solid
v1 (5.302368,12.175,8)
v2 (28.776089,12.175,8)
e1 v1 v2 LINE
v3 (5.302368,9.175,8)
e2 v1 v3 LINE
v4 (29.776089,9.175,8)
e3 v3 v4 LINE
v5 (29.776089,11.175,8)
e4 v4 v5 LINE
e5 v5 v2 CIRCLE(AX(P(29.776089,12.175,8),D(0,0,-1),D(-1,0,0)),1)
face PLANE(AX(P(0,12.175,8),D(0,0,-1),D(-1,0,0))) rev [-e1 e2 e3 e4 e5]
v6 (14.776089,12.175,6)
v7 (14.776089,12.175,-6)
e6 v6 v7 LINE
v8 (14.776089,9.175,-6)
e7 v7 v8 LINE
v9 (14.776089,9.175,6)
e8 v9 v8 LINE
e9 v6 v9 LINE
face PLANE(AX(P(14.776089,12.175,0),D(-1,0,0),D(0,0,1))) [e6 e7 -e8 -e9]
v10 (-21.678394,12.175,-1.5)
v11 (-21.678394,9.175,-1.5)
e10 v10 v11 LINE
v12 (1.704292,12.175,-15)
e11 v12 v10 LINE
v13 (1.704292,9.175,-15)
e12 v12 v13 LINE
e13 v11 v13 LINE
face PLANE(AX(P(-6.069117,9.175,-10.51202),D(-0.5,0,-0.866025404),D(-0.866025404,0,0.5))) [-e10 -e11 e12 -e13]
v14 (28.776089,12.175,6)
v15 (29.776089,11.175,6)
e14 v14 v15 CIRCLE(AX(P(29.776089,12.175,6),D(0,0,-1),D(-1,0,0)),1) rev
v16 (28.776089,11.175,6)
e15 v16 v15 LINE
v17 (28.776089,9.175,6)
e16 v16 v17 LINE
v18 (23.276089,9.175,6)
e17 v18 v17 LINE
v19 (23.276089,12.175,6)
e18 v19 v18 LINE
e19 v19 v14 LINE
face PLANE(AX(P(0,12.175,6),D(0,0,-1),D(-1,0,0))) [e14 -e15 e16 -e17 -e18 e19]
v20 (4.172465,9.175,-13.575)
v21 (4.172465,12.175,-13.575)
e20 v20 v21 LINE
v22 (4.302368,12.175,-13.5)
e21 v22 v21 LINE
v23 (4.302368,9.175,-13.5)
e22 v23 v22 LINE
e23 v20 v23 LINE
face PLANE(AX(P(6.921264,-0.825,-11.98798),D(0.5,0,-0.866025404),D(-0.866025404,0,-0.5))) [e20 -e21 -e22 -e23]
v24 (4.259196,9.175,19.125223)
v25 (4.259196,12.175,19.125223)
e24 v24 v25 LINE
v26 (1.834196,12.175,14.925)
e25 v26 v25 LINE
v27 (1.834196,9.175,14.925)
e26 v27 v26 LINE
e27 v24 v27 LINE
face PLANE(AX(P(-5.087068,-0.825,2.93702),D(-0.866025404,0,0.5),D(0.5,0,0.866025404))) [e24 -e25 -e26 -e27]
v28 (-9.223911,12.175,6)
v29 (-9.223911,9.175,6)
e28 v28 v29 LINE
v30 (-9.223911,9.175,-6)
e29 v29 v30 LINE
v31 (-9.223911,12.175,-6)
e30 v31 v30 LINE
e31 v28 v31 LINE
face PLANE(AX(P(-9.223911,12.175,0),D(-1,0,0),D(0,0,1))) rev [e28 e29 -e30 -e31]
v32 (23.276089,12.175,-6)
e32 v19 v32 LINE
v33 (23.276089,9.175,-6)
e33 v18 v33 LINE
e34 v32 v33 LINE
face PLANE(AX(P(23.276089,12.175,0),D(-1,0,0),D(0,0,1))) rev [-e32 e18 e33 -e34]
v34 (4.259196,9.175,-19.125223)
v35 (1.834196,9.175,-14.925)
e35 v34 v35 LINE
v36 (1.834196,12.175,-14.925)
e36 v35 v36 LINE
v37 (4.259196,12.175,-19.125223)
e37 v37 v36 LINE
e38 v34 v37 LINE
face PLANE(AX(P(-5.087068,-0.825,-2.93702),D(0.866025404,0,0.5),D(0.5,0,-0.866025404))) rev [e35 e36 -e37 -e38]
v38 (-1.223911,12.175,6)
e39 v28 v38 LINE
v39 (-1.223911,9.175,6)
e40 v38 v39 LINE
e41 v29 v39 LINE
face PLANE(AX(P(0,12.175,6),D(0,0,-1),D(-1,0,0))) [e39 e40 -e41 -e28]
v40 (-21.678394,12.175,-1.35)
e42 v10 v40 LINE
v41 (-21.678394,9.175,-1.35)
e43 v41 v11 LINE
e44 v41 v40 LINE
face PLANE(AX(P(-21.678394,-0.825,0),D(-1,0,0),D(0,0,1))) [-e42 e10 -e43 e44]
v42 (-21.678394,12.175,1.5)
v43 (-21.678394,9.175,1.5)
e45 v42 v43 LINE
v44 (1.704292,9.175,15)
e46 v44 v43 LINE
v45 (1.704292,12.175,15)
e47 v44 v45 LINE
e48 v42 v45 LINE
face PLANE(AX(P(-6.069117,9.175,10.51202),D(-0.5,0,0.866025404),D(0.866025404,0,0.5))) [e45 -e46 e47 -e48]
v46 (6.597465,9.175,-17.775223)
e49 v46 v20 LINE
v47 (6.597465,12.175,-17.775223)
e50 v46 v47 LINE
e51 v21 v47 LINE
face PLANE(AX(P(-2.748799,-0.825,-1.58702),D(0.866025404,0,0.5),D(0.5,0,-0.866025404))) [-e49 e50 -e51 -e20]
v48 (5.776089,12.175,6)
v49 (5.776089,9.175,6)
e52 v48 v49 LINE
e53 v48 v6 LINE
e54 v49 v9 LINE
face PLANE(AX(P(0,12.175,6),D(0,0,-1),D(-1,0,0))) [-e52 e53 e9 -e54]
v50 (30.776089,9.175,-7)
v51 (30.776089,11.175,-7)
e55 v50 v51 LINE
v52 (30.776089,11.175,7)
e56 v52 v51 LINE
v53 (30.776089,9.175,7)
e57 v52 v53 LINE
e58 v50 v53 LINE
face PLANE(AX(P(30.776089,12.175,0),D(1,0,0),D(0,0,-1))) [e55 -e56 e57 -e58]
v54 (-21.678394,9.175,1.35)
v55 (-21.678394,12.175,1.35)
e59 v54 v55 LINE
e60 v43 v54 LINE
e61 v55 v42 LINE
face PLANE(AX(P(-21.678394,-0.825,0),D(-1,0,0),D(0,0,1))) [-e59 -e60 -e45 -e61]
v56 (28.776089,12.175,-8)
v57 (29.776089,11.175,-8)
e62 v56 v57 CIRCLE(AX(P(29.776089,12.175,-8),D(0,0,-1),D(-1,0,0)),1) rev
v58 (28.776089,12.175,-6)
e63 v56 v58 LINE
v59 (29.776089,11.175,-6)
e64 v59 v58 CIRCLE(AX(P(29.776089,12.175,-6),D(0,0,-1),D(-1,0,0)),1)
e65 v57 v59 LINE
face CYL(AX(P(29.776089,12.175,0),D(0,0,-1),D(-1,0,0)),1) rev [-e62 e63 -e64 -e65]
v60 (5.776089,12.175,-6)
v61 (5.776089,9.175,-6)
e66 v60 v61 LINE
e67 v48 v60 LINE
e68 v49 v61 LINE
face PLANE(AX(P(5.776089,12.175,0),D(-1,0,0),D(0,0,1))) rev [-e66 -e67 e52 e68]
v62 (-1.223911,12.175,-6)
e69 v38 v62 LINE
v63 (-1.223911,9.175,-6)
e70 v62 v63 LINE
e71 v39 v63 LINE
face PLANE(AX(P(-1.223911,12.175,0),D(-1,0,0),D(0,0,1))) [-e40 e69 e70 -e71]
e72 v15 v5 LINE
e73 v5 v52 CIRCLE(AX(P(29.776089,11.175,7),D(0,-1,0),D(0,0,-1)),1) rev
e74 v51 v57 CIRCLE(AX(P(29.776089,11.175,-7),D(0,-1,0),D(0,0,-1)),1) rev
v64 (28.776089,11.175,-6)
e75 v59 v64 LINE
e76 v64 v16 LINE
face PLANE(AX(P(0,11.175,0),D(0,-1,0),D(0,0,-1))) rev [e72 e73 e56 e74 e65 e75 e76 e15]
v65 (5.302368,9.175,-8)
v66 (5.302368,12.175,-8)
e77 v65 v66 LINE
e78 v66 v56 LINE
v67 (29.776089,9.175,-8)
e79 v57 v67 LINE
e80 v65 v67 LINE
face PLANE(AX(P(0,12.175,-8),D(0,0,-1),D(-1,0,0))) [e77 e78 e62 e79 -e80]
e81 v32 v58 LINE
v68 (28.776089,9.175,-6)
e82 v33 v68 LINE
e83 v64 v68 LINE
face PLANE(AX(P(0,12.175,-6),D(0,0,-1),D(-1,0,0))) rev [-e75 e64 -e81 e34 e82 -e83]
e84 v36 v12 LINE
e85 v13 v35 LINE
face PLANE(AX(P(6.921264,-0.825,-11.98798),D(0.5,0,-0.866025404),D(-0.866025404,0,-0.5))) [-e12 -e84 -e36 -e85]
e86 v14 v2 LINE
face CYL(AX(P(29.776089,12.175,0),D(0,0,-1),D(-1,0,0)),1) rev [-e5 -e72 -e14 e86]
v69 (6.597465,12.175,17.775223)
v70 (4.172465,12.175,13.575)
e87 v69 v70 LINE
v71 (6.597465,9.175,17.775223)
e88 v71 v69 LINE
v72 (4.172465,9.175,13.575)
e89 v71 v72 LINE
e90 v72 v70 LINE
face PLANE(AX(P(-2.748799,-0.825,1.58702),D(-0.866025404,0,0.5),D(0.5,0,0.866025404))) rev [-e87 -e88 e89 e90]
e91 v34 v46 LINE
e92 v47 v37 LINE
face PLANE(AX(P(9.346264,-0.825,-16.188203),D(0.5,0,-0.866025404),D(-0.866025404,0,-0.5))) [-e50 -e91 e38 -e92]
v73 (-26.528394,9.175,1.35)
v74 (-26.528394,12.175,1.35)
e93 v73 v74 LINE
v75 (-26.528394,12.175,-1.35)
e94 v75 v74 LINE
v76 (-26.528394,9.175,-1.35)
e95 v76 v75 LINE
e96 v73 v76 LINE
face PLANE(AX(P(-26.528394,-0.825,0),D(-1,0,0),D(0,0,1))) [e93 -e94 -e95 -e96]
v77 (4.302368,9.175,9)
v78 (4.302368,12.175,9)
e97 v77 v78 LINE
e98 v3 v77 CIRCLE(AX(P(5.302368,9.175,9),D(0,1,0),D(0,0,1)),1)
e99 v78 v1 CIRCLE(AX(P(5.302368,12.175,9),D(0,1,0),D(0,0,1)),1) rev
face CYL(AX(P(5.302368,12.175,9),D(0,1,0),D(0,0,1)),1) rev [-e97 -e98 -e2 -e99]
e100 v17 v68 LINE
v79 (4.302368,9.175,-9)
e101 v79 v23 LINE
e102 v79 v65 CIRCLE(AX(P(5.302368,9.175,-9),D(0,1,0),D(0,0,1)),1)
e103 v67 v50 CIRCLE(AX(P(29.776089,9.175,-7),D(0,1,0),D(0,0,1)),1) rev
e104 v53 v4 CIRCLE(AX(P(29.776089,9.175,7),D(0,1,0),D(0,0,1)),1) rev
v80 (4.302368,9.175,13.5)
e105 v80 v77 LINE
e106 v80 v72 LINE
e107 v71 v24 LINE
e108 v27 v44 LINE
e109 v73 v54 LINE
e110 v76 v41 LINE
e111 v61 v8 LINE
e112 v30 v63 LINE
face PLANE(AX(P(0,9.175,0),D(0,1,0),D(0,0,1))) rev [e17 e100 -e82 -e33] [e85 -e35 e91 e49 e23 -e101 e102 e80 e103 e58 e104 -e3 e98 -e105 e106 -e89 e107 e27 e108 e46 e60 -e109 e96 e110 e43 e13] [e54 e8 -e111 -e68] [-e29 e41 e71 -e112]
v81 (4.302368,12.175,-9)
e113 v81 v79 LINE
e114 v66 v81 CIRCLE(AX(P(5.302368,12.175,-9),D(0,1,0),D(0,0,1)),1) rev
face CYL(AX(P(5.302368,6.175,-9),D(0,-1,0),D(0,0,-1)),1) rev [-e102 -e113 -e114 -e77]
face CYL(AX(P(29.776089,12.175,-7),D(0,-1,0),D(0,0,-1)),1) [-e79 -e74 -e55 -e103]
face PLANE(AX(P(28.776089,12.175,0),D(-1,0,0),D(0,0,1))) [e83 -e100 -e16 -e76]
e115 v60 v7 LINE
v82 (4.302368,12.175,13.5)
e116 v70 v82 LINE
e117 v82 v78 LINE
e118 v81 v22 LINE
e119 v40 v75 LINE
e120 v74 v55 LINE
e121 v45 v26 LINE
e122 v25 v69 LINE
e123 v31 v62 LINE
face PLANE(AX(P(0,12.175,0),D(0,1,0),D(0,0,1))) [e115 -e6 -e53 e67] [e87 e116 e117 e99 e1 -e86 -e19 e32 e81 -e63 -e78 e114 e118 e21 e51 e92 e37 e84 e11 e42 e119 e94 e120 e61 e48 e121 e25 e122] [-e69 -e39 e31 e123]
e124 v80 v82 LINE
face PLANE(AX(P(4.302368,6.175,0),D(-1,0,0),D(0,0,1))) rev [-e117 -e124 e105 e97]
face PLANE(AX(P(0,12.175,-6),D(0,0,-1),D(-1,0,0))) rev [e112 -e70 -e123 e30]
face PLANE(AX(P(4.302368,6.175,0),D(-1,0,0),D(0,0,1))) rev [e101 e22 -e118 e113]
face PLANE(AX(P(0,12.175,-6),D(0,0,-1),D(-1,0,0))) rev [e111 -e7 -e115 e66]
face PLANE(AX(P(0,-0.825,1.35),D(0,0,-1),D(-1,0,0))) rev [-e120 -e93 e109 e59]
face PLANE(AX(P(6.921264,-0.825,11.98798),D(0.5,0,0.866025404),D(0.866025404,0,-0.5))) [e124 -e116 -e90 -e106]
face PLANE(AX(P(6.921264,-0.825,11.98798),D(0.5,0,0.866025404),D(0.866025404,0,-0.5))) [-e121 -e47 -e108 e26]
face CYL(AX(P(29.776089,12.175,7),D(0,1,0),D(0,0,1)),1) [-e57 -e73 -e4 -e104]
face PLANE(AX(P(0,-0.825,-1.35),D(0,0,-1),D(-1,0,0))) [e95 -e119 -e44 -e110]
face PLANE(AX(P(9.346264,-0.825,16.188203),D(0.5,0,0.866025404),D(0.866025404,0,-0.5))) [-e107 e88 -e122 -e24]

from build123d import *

# Parameters (mm, degrees)
SKETCH2_R                   = 88.9
BOSS_EXTRUDE1_DEPTH         = 3.175
SKETCH4_W                   = 15
SKETCH4_H                   = 17
SKETCH4_W_2                 = 21.412198496
SKETCH4_H_2                 = 63.5
CUT_EXTRUDE2_DEPTH          = 126.763669734
CIRPATTERN1_COUNT           = 3
CUT_EXTRUDE3_DEPTH          = 126.763669734
SKETCH8_R                   = 94.275983059
SKETCH8_R_2                 = 86.655983059
CUT_EXTRUDE_THIN1_DEPTH     = 126.763669734
SKETCH9_R                   = 3.175
CUT_EXTRUDE4_DEPTH          = 123.591188203
CIRPATTERN2_COUNT           = 3
SKETCH11_R                  = 1.5875
CUT_EXTRUDE6_DEPTH          = 123.591188203
CIRPATTERN3_COUNT           = 2
CIRPATTERN3_ANGLE           = 120
CIRPATTERN3_COPY_1_SKETCH_R = 1.5875
CIRPATTERN3_COPY_1_DEPTH    = 123.591188203
SKETCH12_R                  = 1.5875
CUT_EXTRUDE7_DEPTH          = 123.591188203
CIRPATTERN4_COUNT           = 2
CIRPATTERN4_ANGLE           = 120
CUT_EXTRUDE8_DEPTH          = 150
FILLET1_R                   = 22.86
BOSS_EXTRUDE2_DEPTH         = 3
SKETCH16_R                  = 86.655983059
CUT_EXTRUDE10_DEPTH         = 123.591188203
SKETCH17_W                  = 3
SKETCH17_H                  = 3
BOSS_EXTRUDE3_DEPTH         = 2
SKETCH18_R                  = 21.678393759
BOSS_EXTRUDE4_DEPTH         = 3
BOSS_EXTRUDE5_DEPTH         = 3
CUT_EXTRUDE11_DEPTH         = 50.498580331
CUT_EXTRUDE11_DEPTH_BACK    = 50.498580331
SKETCH21_W                  = 88.192317665
SKETCH21_H                  = 6
SKETCH23_W                  = 3
SKETCH23_H                  = 3
BOSS_EXTRUDE6_DEPTH         = 3
BOSS_EXTRUDE7_DEPTH         = 3
SKETCH27_W                  = 19.64601661
SKETCH27_H                  = 60.043759506
CUT_EXTRUDE12_DEPTH         = 3
BOSS_EXTRUDE8_DEPTH         = 3
CUT_EXTRUDE13_DEPTH         = 34.081573483
CUT_EXTRUDE13_DEPTH_BACK    = 3
CUT_EXTRUDE14_DEPTH         = 10
SKETCH31_W                  = 8
SKETCH31_H                  = 12
SKETCH31_W_2                = 26.473720558
SKETCH31_H_2                = 16
BOSS_EXTRUDE9_DEPTH         = 3
SKETCH32_W                  = 38.250446416
SKETCH32_H                  = 3
CUT_EXTRUDE15_DEPTH         = 62.626362233
SKETCH34_W                  = 2
SKETCH34_H                  = 16
CUT_EXTRUDE16_DEPTH         = 1
FILLET2_R                   = 1


with BuildPart() as part:
    # Sketch2 → Boss-Extrude1 (new body)
    with BuildSketch(Plane(origin=(0, 0, 0), x_dir=(1, 0, 0), z_dir=(0, 1, 0))):
        with Locations(Location((0, 0, 0), (0, 0, 270))):
            Circle(SKETCH2_R)
    extrude(amount=BOSS_EXTRUDE1_DEPTH)

    # Sketch4 → Cut-Extrude2 (cut, through all)
    with BuildSketch(Plane(origin=(0, 3.175, 0), x_dir=(1, 0, 0), z_dir=(0, 1, 0))):
        Polygon((23.51, 15.5), (16.51, 15.5), (16.51, -15.5), (23.51, -15.5), (23.51, -8.5), (23.51, 8.5), align=None)
        with Locations((73.13, 0)):
            Rectangle(SKETCH4_W, SKETCH4_H)
        with Locations((31.01, 0)):
            Rectangle(SKETCH4_W, SKETCH4_H)
        with Locations((91.336099248, 0)):
            Rectangle(SKETCH4_W_2, SKETCH4_H_2)
    cut_extrude2 = extrude(amount=-CUT_EXTRUDE2_DEPTH, mode=Mode.SUBTRACT)

    # CirPattern1: Cut-Extrude2 ×3 about axis
    cirpattern1_axis = Axis((0, 0, 0), (0, 1, 0))
    for i in range(1, CIRPATTERN1_COUNT):
        add(cut_extrude2.rotate(cirpattern1_axis, i * 360 / CIRPATTERN1_COUNT), mode=Mode.SUBTRACT)

    # Sketch6 → Cut-Extrude3 (cut, through all)
    with BuildSketch(Plane(origin=(0, 3.175, 0), x_dir=(1, 0, 0), z_dir=(0, 1, 0))):
        Polygon((-21.678393759, -6.548079416), (-21.678393759, 6.548079416), (5.168393759, 22.048079416), (16.51, 15.5), (16.51, -15.5), (5.168393759, -22.048079416), align=None)
    extrude(amount=-CUT_EXTRUDE3_DEPTH, mode=Mode.SUBTRACT)

    # Sketch8 → Cut-Extrude-Thin1 (cut, through all)
    with BuildSketch(Plane(origin=(0, 3.175, 0), x_dir=(1, 0, 0), z_dir=(0, 1, 0))):
        Circle(SKETCH8_R)
        Circle(SKETCH8_R_2, mode=Mode.SUBTRACT)
    extrude(amount=-CUT_EXTRUDE_THIN1_DEPTH, mode=Mode.SUBTRACT)

    # Sketch9 → Cut-Extrude4 (cut, through all)
    with BuildSketch(Plane(origin=(0, 3.175, 0), x_dir=(1, 0, 0), z_dir=(0, 1, 0))):
        with Locations(Location((65.549718535, 24.13, 0), (0, 0, 270))):
            Circle(SKETCH9_R)
        with Locations(Location((65.549718535, -24.13, 0), (0, 0, 90))):
            Circle(SKETCH9_R)
    cut_extrude4 = extrude(amount=-CUT_EXTRUDE4_DEPTH, mode=Mode.SUBTRACT)

    # CirPattern2: Cut-Extrude4 ×3 about axis
    cirpattern2_axis = Axis((0, 0, 0), (0, 1, 0))
    for i in range(1, CIRPATTERN2_COUNT):
        add(cut_extrude4.rotate(cirpattern2_axis, i * 360 / CIRPATTERN2_COUNT), mode=Mode.SUBTRACT)

    # Sketch11 → Cut-Extrude6 (cut, through all)
    with BuildSketch(Plane(origin=(0, 3.175, 0), x_dir=(1, 0, 0), z_dir=(0, 1, 0))):
        with Locations(Location((-74.764393759, 36.83, 0), (0, 0, 270))):
            Circle(SKETCH11_R)
        with Locations(Location((-62.064393759, 36.83, 0), (0, 0, 270))):
            Circle(SKETCH11_R)
        with Locations(Location((-74.764393759, 24.13, 0), (0, 0, 270))):
            Circle(SKETCH11_R)
    cut_extrude6 = extrude(amount=-CUT_EXTRUDE6_DEPTH, mode=Mode.SUBTRACT)

    # Mirror1: Cut-Extrude6 across plane
    add(cut_extrude6.mirror(Plane.XY), mode=Mode.SUBTRACT)

    # CirPattern3: Cut-Extrude6 ×2 about axis
    cirpattern3_axis = Axis((0, 0, 0), (0, 1, 0))
    for i in range(1, CIRPATTERN3_COUNT):
        add(cut_extrude6.rotate(cirpattern3_axis, i * CIRPATTERN3_ANGLE / (CIRPATTERN3_COUNT - 1)), mode=Mode.SUBTRACT)

    # CirPattern3 copy 1 sketch → CirPattern3 copy 1 (cut, through all)
    with BuildSketch(Plane(origin=(0, 3.175, 0), x_dir=(-0.5000000000000044, 0, -0.866025403784436), z_dir=(0, 1, 0))):
        with Locations((-74.764393759, -36.83)):
            Circle(CIRPATTERN3_COPY_1_SKETCH_R)
        with Locations((-62.064393759, -36.83)):
            Circle(CIRPATTERN3_COPY_1_SKETCH_R)
        with Locations((-74.764393759, -24.13)):
            Circle(CIRPATTERN3_COPY_1_SKETCH_R)
    extrude(amount=-CIRPATTERN3_COPY_1_DEPTH, mode=Mode.SUBTRACT)

    # Sketch12 → Cut-Extrude7 (cut, through all)
    with BuildSketch(Plane(origin=(0, 3.175, 0), x_dir=(1, 0, 0), z_dir=(0, 1, 0))):
        with Locations(Location((-33.108393759, 0, 0), (0, 0, 270))):
            Circle(SKETCH12_R)
        with BuildLine():
            ThreePointArc((-25.488393759, 5.3975), (-27.075893759, 3.81), (-25.488393759, 2.2225))
            Line((-25.488393759, 2.2225), (-25.488393759, 5.3975))
        make_face()
        with BuildLine():
            Line((-25.488393759, 5.3975), (-25.488393759, 2.2225))
            ThreePointArc((-25.488393759, 2.2225), (-24.365861744, 2.687467985), (-23.900893759, 3.81))
            ThreePointArc((-23.900893759, 3.81), (-24.365861744, 4.932532015), (-25.488393759, 5.3975))
        make_face()
        with BuildLine():
            ThreePointArc((-25.488393759, -2.2225), (-27.075893759, -3.81), (-25.488393759, -5.3975))
            Line((-25.488393759, -5.3975), (-25.488393759, -2.2225))
        make_face()
        with BuildLine():
            Line((-25.488393759, -2.2225), (-25.488393759, -5.3975))
            ThreePointArc((-25.488393759, -5.3975), (-24.365861744, -4.932532015), (-23.900893759, -3.81))
            ThreePointArc((-23.900893759, -3.81), (-24.365861744, -2.687467985), (-25.488393759, -2.2225))
        make_face()
    cut_extrude7 = extrude(amount=-CUT_EXTRUDE7_DEPTH, mode=Mode.SUBTRACT)

    # CirPattern4: Cut-Extrude7 ×2 about axis
    cirpattern4_axis = Axis((0, 0, 0), (0, 1, 0))
    for i in range(1, CIRPATTERN4_COUNT):
        add(cut_extrude7.rotate(cirpattern4_axis, i * CIRPATTERN4_ANGLE / (CIRPATTERN4_COUNT - 1)), mode=Mode.SUBTRACT)

    # Sketch10 → Cut-Extrude8 (cut)
    with BuildSketch(Plane(origin=(0, 3.175, 0), x_dir=(1, 0, 0), z_dir=(0, 1, 0))):
        Polygon((49.845863359, 15.215567884), (75.245863359, 59.209658396), (13.654136641, 94.769658396), (-11.745863359, 50.775567884), align=None)
    extrude(amount=-CUT_EXTRUDE8_DEPTH, mode=Mode.SUBTRACT)

    # Fillet1
    fillet1_edges = [part.edges().sort_by_distance(p)[0] for p in [
        (49.845863359, 1.5875, -15.215567884),
        (-11.745863359, 1.5875, -50.775567884),
    ]]
    fillet(fillet1_edges, radius=FILLET1_R)

    # Sketch16 → Cut-Extrude10 (cut, through all)
    with BuildSketch(Plane(origin=(0, 3.175, 0), x_dir=(1, 0, 0), z_dir=(0, 1, 0))):
        Circle(SKETCH16_R)
        Polygon((-21.678393759, -6.548079416), (5.168393759, -22.048079416), (16.51, -15.5), (16.51, 15.5), (5.168393759, 22.048079416), (-21.678393759, 6.548079416), align=None, mode=Mode.SUBTRACT)
    extrude(amount=-CUT_EXTRUDE10_DEPTH, mode=Mode.SUBTRACT)


with BuildPart() as body_2:
    # Sketch15 → Boss-Extrude2 (new body)
    with BuildSketch(Plane(origin=(0, 3.175, 0), x_dir=(1, 0, 0), z_dir=(0, 1, 0))):
        Polygon((5.168393759, -22.048079416), (16.51, -15.5), (16.51, 15.5), (5.168393759, 22.048079416), (-21.678393759, 6.548079416), (-21.678393759, -6.548079416), align=None)
    extrude(amount=BOSS_EXTRUDE2_DEPTH)

    # Sketch17 → Boss-Extrude3 (add)
    with BuildSketch(Plane.ZY.offset(21.678393759)):
        with Locations((0, 4.675)):
            Rectangle(SKETCH17_W, SKETCH17_H)
    extrude(amount=BOSS_EXTRUDE3_DEPTH)

    # Sketch18 → Boss-Extrude4 (add)
    with BuildSketch(Plane(origin=(0, 6.175, 0), x_dir=(1, 0, 0), z_dir=(0, 1, 0))):
        Circle(SKETCH18_R)
    extrude(amount=-BOSS_EXTRUDE4_DEPTH)

    # Sketch20 → Boss-Extrude5 (add)
    # profile 1 of 3: a face of its own
    with BuildSketch(Plane(origin=(0, 6.175, 0), x_dir=(1, 0, 0), z_dir=(0, 1, 0))):
        Polygon((12.138234985, -18.024039708), (12.138234985, 18.024039708), (9.540158774, 19.524039708), (-21.678393759, 1.5), (-23.678393759, 1.5), (-23.678393759, -1.5), (-21.678393759, -1.5), (9.540158774, -19.524039708), align=None)
        Polygon((9.138234985, -1.732050808), (9.138234985, -15.827887286), (-3.069117493, -8.779969047), align=None, mode=Mode.SUBTRACT)
        Polygon((-6.069117493, -7.047918239), (-18.27646997, 0), (-6.069117493, 7.047918239), align=None, mode=Mode.SUBTRACT)
        Polygon((-3.069117493, 5.315867431), (6.138234985, 0), (-3.069117493, -5.315867431), align=None, mode=Mode.SUBTRACT)
        Polygon((-3.069117493, 8.779969047), (9.138234985, 15.827887286), (9.138234985, 1.732050808), align=None, mode=Mode.SUBTRACT)
    # profile 2 of 3: a face of its own
    with BuildSketch(Plane(origin=(0, 6.175, 0), x_dir=(1, 0, 0), z_dir=(0, 1, 0))):
        Polygon((13.138234985, -19.756090516), (12.138234985, -18.024039708), (9.540158774, -19.524039708), (10.540158774, -21.256090516), align=None)
    # profile 3 of 3: a face of its own
    with BuildSketch(Plane(origin=(0, 6.175, 0), x_dir=(1, 0, 0), z_dir=(0, 1, 0))):
        Polygon((9.540158774, 19.524039708), (12.138234985, 18.024039708), (13.138234985, 19.756090516), (10.540158774, 21.256090516), align=None)
    extrude(amount=BOSS_EXTRUDE5_DEPTH)

    # Sketch21 → Cut-Extrude11 (cut, two sides: drawn at the far end of the back side and taken through both)
    with BuildSketch(Plane.ZY.offset(21.678393759).offset(-CUT_EXTRUDE11_DEPTH_BACK)):
        with Locations((-22.048079416, 3.175)):
            Rectangle(SKETCH21_W, SKETCH21_H)
    extrude(amount=CUT_EXTRUDE11_DEPTH + CUT_EXTRUDE11_DEPTH_BACK, mode=Mode.SUBTRACT)

    # Sketch23 → Boss-Extrude6 (add, through all)
    with BuildSketch(Plane(origin=(0, 9.175, 0), x_dir=(1, 0, 0), z_dir=(0, 1, 0))):
        Polygon((13.138234985, 19.756090516), (10.540158774, 21.256090516), (12.040158774, 23.854166727), (14.638234985, 22.354166727), align=None)
        with Locations((-25.178393759, 0)):
            Rectangle(SKETCH23_W, SKETCH23_H)
        Polygon((10.540158774, -21.256090516), (13.138234985, -19.756090516), (14.638234985, -22.354166727), (12.040158774, -23.854166727), align=None)
    extrude(amount=-BOSS_EXTRUDE6_DEPTH)

    # Sketch25 → Boss-Extrude7 (add)
    with BuildSketch(Plane(origin=(0, 9.175, 0), x_dir=(1, 0, 0), z_dir=(0, 1, 0))):
        Polygon((-21.678393759, -1.5), (9.540158774, -19.524039708), (12.040158774, -23.854166727), (14.638234985, -22.354166727), (12.138234985, -18.024039708), (12.138234985, 18.024039708), (14.638234985, 22.354166727), (12.040158774, 23.854166727), (9.540158774, 19.524039708), (-21.678393759, 1.5), (-26.678393759, 1.5), (-26.678393759, -1.5), align=None)
    extrude(amount=-BOSS_EXTRUDE7_DEPTH)

    # Sketch27 → Cut-Extrude12 (cut)
    with BuildSketch(Plane(origin=(0, 9.175, 0), x_dir=(1, 0, 0), z_dir=(0, 1, 0))):
        with Locations((11.527300449, -3.453437088)):
            Rectangle(SKETCH27_W, SKETCH27_H)
    extrude(amount=-CUT_EXTRUDE12_DEPTH, mode=Mode.SUBTRACT)

    # Sketch26 → Boss-Extrude8 (add)
    with BuildSketch(Plane(origin=(0, 9.175, 0), x_dir=(1, 0, 0), z_dir=(0, 1, 0))):
        Polygon((1.704292144, 15), (-21.678393759, 1.5), (-26.678393759, 1.5), (-26.678393759, -1.5), (-21.678393759, -1.5), (1.704292144, -15), (6.704292144, -17.886751346), (6.802368355, -17.830127019), (4.302368355, -13.5), (4.302368355, 13.5), (6.802368355, 17.830127019), (6.704292144, 17.886751346), align=None)
        Polygon((4.204292144, 19.330127019), (1.704292144, 15), (6.704292144, 17.886751346), align=None)
        Polygon((6.704292144, -17.886751346), (1.704292144, -15), (4.204292144, -19.330127019), align=None)
    extrude(amount=-BOSS_EXTRUDE8_DEPTH)

    # Sketch28 → Cut-Extrude13 (cut, two sides: drawn at the far end of the back side and taken through both)
    with BuildSketch(Plane(origin=(0, 9.175, 0), x_dir=(1, 0, 0), z_dir=(0, 1, 0)).offset(-CUT_EXTRUDE13_DEPTH_BACK)):
        Polygon((-9.987050808, 4.785898385), (-18.27646997, 0), (-9.987050808, 0), align=None)
        Polygon((-9.987050808, 0), (-18.27646997, 0), (-9.987050808, -4.785898385), align=None)
        Polygon((-6.987050808, -6.517949192), (1.302368355, -11.303847577), (1.302368355, -1.732050808), align=None)
        Polygon((1.302368355, 1.732050808), (1.302368355, 11.303847577), (-6.987050808, 6.517949192), align=None)
    extrude(amount=CUT_EXTRUDE13_DEPTH + CUT_EXTRUDE13_DEPTH_BACK, mode=Mode.SUBTRACT)

    # Sketch29 → Cut-Extrude14 (cut)
    with BuildSketch(Plane(origin=(0, 9.175, 0), x_dir=(1, 0, 0), z_dir=(0, 1, 0))):
        Polygon((4.302368355, 13.5), (6.802368355, 17.830127019), (4.204292144, 19.330127019), (1.704292144, 15), (1.834195954, 14.925), (4.259195954, 19.125223208), (6.597464544, 17.775223208), (4.172464544, 13.575), align=None)
        Polygon((-21.678393759, 1.35), (-21.678393759, 1.5), (-26.678393759, 1.5), (-26.678393759, -1.5), (-21.678393759, -1.5), (-21.678393759, -1.35), (-26.528393759, -1.35), (-26.528393759, 1.35), align=None)
        Polygon((1.704292144, -15), (4.204292144, -19.330127019), (6.802368355, -17.830127019), (4.302368355, -13.5), (4.172464544, -13.575), (6.597464544, -17.775223208), (4.259195954, -19.125223208), (1.834195954, -14.925), align=None)
    extrude(amount=-CUT_EXTRUDE14_DEPTH, mode=Mode.SUBTRACT)

    # Sketch31 → Boss-Extrude9 (add)
    # profile 1 of 2: a face of its own
    with BuildSketch(Plane(origin=(0, 9.175, 0), x_dir=(1, 0, 0), z_dir=(0, 1, 0))):
        Polygon((4.302368355, -8), (4.302368355, 8), (4.302368355, 13.5), (4.172464544, 13.575), (6.597464544, 17.775223208), (4.259195954, 19.125223208), (1.834195954, 14.925), (1.704292144, 15), (-21.678393759, 1.5), (-21.678393759, 1.35), (-26.528393759, 1.35), (-26.528393759, -1.35), (-21.678393759, -1.35), (-21.678393759, -1.5), (1.704292144, -15), (1.834195954, -14.925), (4.259195954, -19.125223208), (6.597464544, -17.775223208), (4.172464544, -13.575), (4.302368355, -13.5), align=None)
        with Locations((-5.223911087, 0)):
            Rectangle(SKETCH31_W, SKETCH31_H, mode=Mode.SUBTRACT)
    # profile 2 of 2: a face of its own
    with BuildSketch(Plane(origin=(0, 9.175, 0), x_dir=(1, 0, 0), z_dir=(0, 1, 0))):
        with Locations((17.539228634, 0)):
            Rectangle(SKETCH31_W_2, SKETCH31_H_2)
        Polygon((5.776088913, -6), (5.776088913, -5), (5.776088913, 5), (5.776088913, 6), (14.776088913, 6), (14.776088913, 5), (14.776088913, -5), (14.776088913, -6), align=None, mode=Mode.SUBTRACT)
        Polygon((28.776088913, -6), (23.276088913, -6), (23.276088913, -5), (23.276088913, 5), (23.276088913, 6), (28.776088913, 6), (28.776088913, 5), (28.776088913, -5), align=None, mode=Mode.SUBTRACT)
    extrude(amount=BOSS_EXTRUDE9_DEPTH)

    # Sketch32 → Cut-Extrude15 (cut, through all)
    with BuildSketch(Plane.ZY.offset(26.528393759)):
        with Locations((0, 7.675)):
            Rectangle(SKETCH32_W, SKETCH32_H)
    extrude(amount=-CUT_EXTRUDE15_DEPTH, mode=Mode.SUBTRACT)

    # Sketch34 → Cut-Extrude16 (cut)
    with BuildSketch(Plane(origin=(0, 12.175, 0), x_dir=(1, 0, 0), z_dir=(0, 1, 0))):
        with Locations((29.776088913, 0)):
            Rectangle(SKETCH34_W, SKETCH34_H)
    extrude(amount=-CUT_EXTRUDE16_DEPTH, mode=Mode.SUBTRACT)

    # Fillet2
    fillet2_edges = [body_2.edges().sort_by_distance(p)[0] for p in [
        (4.302368355, 10.675, -8),
        (4.302368355, 10.675, 8),
        (30.776088913, 10.175, -8),
        (28.776088913, 11.175, -7),
        (30.776088913, 10.175, 8),
        (28.776088913, 11.175, 7),
    ]]
    fillet(fillet2_edges, radius=FILLET2_R - 0.0001)  # a hair under: the kernel refuses the full size


solid = body_2.part
